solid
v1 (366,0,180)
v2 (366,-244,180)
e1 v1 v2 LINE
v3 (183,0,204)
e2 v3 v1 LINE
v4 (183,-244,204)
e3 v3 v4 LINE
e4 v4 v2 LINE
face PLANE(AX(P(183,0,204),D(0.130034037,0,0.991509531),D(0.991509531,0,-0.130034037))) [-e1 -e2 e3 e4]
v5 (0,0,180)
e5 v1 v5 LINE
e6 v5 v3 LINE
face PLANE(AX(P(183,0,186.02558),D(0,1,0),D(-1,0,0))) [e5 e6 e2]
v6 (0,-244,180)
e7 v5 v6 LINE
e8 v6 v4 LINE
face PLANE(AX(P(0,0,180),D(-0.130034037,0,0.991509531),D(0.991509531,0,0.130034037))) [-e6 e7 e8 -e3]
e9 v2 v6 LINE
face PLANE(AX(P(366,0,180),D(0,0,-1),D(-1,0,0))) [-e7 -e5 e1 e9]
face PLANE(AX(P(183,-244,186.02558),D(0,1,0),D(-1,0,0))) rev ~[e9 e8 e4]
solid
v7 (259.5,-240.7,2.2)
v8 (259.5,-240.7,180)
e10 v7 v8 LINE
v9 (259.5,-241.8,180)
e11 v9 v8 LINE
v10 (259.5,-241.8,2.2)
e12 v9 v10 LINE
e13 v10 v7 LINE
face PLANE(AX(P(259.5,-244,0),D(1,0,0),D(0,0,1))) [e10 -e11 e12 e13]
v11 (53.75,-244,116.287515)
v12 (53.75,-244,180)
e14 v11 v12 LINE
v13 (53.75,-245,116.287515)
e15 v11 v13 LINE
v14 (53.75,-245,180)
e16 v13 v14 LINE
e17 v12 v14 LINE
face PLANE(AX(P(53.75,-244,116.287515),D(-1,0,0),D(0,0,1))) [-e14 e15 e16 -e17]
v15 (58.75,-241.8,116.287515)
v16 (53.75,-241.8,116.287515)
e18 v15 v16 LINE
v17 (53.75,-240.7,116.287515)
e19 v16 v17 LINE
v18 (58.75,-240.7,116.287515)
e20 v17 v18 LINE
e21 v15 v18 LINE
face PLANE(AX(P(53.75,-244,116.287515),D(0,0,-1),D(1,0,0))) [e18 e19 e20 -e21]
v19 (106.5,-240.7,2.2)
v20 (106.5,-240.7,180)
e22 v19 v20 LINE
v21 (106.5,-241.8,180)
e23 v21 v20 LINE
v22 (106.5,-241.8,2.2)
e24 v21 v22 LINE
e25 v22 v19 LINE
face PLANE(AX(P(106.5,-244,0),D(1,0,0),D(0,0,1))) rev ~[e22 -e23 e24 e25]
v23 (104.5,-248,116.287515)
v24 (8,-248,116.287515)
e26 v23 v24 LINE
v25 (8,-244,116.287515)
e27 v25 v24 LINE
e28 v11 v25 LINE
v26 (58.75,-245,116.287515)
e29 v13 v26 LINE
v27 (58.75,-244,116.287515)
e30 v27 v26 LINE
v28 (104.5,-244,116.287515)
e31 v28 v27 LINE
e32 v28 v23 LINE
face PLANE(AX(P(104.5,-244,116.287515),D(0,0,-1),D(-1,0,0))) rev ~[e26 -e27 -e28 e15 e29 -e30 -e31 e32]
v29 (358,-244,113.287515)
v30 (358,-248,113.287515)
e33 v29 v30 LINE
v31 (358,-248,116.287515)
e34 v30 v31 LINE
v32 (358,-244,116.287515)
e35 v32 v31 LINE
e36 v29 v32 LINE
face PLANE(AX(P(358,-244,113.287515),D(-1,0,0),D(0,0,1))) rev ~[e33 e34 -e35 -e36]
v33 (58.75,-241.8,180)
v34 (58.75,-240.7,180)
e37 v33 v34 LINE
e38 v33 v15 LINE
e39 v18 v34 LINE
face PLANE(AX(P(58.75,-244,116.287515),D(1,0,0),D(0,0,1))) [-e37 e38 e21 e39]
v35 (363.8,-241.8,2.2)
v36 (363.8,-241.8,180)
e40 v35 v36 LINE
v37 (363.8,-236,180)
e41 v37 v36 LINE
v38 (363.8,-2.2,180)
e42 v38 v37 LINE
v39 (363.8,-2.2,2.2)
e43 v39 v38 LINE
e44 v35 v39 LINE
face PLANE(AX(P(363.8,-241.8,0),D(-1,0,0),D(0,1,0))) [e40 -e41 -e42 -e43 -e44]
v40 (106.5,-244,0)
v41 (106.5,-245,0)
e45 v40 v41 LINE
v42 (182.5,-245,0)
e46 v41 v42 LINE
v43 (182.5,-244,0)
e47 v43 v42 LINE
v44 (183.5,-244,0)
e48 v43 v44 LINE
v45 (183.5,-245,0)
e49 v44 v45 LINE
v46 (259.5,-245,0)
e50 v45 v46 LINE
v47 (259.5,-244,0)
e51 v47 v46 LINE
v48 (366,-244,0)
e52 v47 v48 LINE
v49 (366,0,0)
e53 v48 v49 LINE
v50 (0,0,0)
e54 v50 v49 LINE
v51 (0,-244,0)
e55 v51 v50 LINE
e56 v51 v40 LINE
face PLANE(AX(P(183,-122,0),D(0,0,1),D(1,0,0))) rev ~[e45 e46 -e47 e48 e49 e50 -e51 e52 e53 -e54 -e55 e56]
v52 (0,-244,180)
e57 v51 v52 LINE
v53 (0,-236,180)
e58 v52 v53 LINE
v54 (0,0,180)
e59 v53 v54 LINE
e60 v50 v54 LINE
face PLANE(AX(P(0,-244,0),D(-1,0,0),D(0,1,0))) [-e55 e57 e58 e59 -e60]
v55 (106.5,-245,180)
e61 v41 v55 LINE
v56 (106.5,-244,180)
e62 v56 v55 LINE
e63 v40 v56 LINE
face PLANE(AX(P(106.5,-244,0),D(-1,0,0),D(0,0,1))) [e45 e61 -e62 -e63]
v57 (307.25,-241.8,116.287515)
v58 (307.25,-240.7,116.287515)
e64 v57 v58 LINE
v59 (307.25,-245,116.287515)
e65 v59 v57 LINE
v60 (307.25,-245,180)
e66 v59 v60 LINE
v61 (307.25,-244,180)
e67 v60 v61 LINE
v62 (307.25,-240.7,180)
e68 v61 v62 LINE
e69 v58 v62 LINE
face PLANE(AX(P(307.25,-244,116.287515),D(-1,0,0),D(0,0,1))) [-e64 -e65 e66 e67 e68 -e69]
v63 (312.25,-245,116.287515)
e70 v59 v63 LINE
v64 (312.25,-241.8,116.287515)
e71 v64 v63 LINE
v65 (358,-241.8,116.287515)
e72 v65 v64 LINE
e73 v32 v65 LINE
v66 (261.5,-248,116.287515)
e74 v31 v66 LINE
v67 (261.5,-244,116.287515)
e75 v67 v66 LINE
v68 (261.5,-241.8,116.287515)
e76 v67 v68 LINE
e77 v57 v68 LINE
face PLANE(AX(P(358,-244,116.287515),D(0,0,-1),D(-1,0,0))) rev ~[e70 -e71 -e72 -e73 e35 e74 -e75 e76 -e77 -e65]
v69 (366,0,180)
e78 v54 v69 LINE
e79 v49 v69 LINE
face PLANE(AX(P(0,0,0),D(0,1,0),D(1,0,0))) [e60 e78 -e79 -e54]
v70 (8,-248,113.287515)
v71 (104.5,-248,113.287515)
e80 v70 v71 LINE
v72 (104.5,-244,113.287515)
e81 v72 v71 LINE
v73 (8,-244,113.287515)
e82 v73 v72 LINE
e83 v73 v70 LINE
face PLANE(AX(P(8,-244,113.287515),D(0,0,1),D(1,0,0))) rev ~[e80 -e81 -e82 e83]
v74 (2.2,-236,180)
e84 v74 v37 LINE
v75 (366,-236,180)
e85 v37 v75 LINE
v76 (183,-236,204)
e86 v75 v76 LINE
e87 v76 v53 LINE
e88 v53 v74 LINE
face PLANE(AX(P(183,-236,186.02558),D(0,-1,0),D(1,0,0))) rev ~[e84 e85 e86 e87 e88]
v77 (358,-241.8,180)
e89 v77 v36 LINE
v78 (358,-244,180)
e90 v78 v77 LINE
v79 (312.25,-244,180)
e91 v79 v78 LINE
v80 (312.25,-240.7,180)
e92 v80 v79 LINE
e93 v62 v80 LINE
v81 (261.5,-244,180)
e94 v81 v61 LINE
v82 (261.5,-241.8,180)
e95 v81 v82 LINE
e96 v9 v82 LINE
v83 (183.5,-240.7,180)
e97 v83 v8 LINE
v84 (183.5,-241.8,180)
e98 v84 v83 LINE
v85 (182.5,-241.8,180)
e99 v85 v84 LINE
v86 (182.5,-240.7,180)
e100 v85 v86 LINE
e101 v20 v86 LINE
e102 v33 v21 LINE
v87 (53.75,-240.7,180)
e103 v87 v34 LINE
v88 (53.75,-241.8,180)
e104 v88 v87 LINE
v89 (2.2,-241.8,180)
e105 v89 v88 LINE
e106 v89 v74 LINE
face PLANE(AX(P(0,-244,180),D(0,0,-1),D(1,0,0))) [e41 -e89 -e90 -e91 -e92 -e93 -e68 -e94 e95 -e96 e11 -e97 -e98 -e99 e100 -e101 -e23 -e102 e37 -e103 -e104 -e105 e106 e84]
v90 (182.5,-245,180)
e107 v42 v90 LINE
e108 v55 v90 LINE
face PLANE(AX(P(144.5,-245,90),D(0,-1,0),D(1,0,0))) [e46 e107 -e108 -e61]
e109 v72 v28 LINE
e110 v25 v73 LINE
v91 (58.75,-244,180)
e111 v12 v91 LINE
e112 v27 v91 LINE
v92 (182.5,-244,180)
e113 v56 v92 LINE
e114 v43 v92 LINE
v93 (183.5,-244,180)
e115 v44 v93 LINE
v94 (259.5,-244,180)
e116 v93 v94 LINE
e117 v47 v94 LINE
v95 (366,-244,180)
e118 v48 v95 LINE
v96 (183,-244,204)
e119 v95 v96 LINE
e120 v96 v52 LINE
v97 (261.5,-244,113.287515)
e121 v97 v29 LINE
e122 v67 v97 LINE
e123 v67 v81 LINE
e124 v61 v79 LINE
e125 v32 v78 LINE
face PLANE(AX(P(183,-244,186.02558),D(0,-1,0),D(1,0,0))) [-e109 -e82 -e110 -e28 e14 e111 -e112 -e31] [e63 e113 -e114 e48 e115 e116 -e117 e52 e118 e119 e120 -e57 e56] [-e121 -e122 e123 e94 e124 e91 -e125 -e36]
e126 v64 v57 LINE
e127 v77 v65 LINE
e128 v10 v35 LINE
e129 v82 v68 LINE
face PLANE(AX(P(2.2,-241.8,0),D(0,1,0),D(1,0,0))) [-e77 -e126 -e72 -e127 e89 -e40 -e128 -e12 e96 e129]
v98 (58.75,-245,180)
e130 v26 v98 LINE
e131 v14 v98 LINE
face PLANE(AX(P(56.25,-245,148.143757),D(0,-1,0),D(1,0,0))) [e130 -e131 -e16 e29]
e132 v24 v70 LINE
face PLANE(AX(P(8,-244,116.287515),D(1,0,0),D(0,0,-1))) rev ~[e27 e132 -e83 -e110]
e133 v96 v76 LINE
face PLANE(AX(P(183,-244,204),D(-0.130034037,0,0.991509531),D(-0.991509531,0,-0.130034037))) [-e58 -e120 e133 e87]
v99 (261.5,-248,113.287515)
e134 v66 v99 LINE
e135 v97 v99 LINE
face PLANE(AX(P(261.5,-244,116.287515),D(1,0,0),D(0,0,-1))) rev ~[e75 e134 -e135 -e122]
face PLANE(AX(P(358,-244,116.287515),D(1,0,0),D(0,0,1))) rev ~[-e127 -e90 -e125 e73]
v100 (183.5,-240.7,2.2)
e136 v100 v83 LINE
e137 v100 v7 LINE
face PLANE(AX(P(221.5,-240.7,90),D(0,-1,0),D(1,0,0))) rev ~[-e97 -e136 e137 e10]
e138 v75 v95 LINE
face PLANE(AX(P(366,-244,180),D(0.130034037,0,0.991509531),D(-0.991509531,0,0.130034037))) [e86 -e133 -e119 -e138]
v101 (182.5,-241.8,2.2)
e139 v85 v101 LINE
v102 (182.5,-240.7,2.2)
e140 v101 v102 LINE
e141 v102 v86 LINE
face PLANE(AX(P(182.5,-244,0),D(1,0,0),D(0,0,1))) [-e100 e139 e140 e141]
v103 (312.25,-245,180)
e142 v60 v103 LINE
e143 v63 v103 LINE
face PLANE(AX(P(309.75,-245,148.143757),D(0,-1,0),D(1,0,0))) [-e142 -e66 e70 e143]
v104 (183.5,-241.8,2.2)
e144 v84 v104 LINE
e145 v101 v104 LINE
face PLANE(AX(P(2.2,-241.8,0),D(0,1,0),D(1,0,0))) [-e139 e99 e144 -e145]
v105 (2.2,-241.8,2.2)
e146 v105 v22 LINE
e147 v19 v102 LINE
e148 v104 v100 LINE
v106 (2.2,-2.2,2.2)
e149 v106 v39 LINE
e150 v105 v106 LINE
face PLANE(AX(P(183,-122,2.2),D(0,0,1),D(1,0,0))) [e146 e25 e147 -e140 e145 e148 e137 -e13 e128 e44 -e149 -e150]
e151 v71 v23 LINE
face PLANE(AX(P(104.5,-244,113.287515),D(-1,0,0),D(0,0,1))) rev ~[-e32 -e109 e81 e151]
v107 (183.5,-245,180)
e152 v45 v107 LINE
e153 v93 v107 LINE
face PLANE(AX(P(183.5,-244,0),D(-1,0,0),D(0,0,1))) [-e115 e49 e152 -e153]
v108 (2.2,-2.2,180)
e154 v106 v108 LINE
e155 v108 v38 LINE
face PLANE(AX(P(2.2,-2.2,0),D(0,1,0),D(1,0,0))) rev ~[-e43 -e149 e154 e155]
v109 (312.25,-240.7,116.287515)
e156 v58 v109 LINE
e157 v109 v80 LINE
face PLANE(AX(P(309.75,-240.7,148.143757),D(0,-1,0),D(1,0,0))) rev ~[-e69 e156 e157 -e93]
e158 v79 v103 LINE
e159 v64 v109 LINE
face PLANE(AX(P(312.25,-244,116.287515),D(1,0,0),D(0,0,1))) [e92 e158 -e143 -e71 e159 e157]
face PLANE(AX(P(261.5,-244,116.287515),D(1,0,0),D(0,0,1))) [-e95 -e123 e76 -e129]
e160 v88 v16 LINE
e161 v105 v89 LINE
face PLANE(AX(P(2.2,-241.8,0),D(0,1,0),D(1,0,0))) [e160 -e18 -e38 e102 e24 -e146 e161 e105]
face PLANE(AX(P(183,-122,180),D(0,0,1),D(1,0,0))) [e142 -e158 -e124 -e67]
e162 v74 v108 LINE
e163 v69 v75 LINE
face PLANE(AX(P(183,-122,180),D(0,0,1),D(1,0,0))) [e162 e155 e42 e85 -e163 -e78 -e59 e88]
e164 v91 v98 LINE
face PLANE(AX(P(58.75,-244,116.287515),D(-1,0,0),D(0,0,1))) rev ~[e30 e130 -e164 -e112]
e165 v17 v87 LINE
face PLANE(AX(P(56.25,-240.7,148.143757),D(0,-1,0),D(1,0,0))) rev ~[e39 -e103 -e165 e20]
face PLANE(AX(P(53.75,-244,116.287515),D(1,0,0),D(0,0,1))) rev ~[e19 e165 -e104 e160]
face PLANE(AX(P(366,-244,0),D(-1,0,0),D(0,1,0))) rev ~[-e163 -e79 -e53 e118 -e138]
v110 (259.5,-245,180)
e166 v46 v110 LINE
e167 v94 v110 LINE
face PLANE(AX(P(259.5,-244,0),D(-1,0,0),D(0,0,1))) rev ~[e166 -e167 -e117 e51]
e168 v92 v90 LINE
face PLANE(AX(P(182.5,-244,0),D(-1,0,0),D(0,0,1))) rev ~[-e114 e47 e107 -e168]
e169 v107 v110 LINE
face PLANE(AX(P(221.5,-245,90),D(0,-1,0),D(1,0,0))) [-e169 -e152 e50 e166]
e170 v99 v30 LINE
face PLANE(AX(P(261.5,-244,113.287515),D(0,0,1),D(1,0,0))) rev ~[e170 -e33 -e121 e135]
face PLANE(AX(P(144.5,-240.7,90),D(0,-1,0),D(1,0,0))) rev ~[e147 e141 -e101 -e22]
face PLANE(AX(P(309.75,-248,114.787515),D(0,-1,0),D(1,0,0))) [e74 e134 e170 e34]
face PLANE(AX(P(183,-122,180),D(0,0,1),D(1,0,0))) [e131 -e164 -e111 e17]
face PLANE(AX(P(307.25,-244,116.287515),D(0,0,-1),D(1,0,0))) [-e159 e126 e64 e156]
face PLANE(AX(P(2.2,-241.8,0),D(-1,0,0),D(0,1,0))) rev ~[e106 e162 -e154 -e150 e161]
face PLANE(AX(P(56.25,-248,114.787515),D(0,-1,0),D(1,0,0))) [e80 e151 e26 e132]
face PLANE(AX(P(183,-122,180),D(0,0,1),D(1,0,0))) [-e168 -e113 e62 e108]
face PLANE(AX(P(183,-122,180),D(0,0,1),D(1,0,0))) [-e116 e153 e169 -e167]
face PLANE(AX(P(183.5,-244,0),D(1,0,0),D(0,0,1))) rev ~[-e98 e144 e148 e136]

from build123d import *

# Parameters (mm, degrees)
F0_W          = 366
F0_H          = 244
F0_W_2        = 361.6
F0_H_2        = 239.6
F1_DEPTH      = 180
F2_DEPTH      = 2.2
F3_W          = 76
F3_H          = 180
F3_W_2        = 5
F3_H_2        = 63.7124854326
F4_DEPTH      = 1
F4_DEPTH_BACK = 3.3
F3_W_3        = 45.75
F5_DEPTH      = 25
F6_DEPTH      = 8
F7_DEPTH      = 4
F9_DEPTH      = 244


# Not quite as in the source:
# - a feature names something its author has since deleted; it is built from what else it names


with BuildPart() as f1:
    # F0 (on Top) → F1 (new body)
    with BuildSketch(Plane.XY):
        with Locations((183, -122)):
            Rectangle(F0_W, F0_H)
        with Locations((183, -122)):
            Rectangle(F0_W_2, F0_H_2, mode=Mode.SUBTRACT)
    extrude(amount=F1_DEPTH)

    # F0 (on Top) → F2 (join)
    with BuildSketch(Plane.XY):
        with Locations((183, -122)):
            Rectangle(F0_W_2, F0_H_2)
    extrude(amount=F2_DEPTH)

    # F3 (on face) → F4 (join, two sides)
    with BuildSketch(Plane.XZ.offset(244)) as f4_sk:
        with Locations((144.5, 90)):
            Rectangle(F3_W, F3_H)
        with Locations((221.5, 90)):
            Rectangle(F3_W, F3_H)
        with Locations((56.25, 148.1437572837)):
            Rectangle(F3_W_2, F3_H_2)
        with Locations((309.75, 148.1437572837)):
            Rectangle(F3_W_2, F3_H_2)
    extrude(amount=F4_DEPTH)
    extrude(f4_sk.sketch, amount=-F4_DEPTH_BACK)

    # F3 (on face) → F5 (cut)
    with BuildSketch(Plane.XZ.offset(244)):
        Polygon((104.5, 180), (106.5, 180), (182.5, 180), (183.5, 180), (259.5, 180), (261.5, 180), (307.25, 180), (312.25, 180), (358, 180), (366, 180), (183, 204), (0, 180), (8, 180), (53.75, 180), (58.75, 180), align=None)
        with Locations((284.375, 148.1437572837)):
            Rectangle(F3_W_3, F3_H_2)
        with Locations((335.125, 148.1437572837)):
            Rectangle(F3_W_3, F3_H_2)
    extrude(amount=-F5_DEPTH, mode=Mode.SUBTRACT)

    # F3 (on face) → F6 (join)
    with BuildSketch(Plane.XZ.offset(244)):
        Polygon((104.5, 180), (106.5, 180), (182.5, 180), (183.5, 180), (259.5, 180), (261.5, 180), (307.25, 180), (312.25, 180), (358, 180), (366, 180), (183, 204), (0, 180), (8, 180), (53.75, 180), (58.75, 180), align=None)
    extrude(amount=-F6_DEPTH)

    # F3 (on face) → F7 (join)
    with BuildSketch(Plane.XZ.offset(244)):
        Polygon((307.25, 116.2875145674), (261.5, 116.2875145674), (261.5, 113.2875145674), (358, 113.2875145674), (358, 116.2875145674), (312.25, 116.2875145674), align=None)
        Polygon((104.5, 113.2875145674), (104.5, 116.2875145674), (58.75, 116.2875145674), (53.75, 116.2875145674), (8, 116.2875145674), (8, 113.2875145674), align=None)
    extrude(amount=F7_DEPTH)


with BuildPart() as f9:
    # F8 (on face) → F9 (new body)
    with BuildSketch(Plane(origin=(0, 0, 0), x_dir=(-1, 0, 0), z_dir=(0, 1, 0))):
        Polygon((-183, 204), (-366, 180), (0, 180), align=None)
    extrude(amount=-F9_DEPTH)


solid = Compound([f1.part, f9.part])
